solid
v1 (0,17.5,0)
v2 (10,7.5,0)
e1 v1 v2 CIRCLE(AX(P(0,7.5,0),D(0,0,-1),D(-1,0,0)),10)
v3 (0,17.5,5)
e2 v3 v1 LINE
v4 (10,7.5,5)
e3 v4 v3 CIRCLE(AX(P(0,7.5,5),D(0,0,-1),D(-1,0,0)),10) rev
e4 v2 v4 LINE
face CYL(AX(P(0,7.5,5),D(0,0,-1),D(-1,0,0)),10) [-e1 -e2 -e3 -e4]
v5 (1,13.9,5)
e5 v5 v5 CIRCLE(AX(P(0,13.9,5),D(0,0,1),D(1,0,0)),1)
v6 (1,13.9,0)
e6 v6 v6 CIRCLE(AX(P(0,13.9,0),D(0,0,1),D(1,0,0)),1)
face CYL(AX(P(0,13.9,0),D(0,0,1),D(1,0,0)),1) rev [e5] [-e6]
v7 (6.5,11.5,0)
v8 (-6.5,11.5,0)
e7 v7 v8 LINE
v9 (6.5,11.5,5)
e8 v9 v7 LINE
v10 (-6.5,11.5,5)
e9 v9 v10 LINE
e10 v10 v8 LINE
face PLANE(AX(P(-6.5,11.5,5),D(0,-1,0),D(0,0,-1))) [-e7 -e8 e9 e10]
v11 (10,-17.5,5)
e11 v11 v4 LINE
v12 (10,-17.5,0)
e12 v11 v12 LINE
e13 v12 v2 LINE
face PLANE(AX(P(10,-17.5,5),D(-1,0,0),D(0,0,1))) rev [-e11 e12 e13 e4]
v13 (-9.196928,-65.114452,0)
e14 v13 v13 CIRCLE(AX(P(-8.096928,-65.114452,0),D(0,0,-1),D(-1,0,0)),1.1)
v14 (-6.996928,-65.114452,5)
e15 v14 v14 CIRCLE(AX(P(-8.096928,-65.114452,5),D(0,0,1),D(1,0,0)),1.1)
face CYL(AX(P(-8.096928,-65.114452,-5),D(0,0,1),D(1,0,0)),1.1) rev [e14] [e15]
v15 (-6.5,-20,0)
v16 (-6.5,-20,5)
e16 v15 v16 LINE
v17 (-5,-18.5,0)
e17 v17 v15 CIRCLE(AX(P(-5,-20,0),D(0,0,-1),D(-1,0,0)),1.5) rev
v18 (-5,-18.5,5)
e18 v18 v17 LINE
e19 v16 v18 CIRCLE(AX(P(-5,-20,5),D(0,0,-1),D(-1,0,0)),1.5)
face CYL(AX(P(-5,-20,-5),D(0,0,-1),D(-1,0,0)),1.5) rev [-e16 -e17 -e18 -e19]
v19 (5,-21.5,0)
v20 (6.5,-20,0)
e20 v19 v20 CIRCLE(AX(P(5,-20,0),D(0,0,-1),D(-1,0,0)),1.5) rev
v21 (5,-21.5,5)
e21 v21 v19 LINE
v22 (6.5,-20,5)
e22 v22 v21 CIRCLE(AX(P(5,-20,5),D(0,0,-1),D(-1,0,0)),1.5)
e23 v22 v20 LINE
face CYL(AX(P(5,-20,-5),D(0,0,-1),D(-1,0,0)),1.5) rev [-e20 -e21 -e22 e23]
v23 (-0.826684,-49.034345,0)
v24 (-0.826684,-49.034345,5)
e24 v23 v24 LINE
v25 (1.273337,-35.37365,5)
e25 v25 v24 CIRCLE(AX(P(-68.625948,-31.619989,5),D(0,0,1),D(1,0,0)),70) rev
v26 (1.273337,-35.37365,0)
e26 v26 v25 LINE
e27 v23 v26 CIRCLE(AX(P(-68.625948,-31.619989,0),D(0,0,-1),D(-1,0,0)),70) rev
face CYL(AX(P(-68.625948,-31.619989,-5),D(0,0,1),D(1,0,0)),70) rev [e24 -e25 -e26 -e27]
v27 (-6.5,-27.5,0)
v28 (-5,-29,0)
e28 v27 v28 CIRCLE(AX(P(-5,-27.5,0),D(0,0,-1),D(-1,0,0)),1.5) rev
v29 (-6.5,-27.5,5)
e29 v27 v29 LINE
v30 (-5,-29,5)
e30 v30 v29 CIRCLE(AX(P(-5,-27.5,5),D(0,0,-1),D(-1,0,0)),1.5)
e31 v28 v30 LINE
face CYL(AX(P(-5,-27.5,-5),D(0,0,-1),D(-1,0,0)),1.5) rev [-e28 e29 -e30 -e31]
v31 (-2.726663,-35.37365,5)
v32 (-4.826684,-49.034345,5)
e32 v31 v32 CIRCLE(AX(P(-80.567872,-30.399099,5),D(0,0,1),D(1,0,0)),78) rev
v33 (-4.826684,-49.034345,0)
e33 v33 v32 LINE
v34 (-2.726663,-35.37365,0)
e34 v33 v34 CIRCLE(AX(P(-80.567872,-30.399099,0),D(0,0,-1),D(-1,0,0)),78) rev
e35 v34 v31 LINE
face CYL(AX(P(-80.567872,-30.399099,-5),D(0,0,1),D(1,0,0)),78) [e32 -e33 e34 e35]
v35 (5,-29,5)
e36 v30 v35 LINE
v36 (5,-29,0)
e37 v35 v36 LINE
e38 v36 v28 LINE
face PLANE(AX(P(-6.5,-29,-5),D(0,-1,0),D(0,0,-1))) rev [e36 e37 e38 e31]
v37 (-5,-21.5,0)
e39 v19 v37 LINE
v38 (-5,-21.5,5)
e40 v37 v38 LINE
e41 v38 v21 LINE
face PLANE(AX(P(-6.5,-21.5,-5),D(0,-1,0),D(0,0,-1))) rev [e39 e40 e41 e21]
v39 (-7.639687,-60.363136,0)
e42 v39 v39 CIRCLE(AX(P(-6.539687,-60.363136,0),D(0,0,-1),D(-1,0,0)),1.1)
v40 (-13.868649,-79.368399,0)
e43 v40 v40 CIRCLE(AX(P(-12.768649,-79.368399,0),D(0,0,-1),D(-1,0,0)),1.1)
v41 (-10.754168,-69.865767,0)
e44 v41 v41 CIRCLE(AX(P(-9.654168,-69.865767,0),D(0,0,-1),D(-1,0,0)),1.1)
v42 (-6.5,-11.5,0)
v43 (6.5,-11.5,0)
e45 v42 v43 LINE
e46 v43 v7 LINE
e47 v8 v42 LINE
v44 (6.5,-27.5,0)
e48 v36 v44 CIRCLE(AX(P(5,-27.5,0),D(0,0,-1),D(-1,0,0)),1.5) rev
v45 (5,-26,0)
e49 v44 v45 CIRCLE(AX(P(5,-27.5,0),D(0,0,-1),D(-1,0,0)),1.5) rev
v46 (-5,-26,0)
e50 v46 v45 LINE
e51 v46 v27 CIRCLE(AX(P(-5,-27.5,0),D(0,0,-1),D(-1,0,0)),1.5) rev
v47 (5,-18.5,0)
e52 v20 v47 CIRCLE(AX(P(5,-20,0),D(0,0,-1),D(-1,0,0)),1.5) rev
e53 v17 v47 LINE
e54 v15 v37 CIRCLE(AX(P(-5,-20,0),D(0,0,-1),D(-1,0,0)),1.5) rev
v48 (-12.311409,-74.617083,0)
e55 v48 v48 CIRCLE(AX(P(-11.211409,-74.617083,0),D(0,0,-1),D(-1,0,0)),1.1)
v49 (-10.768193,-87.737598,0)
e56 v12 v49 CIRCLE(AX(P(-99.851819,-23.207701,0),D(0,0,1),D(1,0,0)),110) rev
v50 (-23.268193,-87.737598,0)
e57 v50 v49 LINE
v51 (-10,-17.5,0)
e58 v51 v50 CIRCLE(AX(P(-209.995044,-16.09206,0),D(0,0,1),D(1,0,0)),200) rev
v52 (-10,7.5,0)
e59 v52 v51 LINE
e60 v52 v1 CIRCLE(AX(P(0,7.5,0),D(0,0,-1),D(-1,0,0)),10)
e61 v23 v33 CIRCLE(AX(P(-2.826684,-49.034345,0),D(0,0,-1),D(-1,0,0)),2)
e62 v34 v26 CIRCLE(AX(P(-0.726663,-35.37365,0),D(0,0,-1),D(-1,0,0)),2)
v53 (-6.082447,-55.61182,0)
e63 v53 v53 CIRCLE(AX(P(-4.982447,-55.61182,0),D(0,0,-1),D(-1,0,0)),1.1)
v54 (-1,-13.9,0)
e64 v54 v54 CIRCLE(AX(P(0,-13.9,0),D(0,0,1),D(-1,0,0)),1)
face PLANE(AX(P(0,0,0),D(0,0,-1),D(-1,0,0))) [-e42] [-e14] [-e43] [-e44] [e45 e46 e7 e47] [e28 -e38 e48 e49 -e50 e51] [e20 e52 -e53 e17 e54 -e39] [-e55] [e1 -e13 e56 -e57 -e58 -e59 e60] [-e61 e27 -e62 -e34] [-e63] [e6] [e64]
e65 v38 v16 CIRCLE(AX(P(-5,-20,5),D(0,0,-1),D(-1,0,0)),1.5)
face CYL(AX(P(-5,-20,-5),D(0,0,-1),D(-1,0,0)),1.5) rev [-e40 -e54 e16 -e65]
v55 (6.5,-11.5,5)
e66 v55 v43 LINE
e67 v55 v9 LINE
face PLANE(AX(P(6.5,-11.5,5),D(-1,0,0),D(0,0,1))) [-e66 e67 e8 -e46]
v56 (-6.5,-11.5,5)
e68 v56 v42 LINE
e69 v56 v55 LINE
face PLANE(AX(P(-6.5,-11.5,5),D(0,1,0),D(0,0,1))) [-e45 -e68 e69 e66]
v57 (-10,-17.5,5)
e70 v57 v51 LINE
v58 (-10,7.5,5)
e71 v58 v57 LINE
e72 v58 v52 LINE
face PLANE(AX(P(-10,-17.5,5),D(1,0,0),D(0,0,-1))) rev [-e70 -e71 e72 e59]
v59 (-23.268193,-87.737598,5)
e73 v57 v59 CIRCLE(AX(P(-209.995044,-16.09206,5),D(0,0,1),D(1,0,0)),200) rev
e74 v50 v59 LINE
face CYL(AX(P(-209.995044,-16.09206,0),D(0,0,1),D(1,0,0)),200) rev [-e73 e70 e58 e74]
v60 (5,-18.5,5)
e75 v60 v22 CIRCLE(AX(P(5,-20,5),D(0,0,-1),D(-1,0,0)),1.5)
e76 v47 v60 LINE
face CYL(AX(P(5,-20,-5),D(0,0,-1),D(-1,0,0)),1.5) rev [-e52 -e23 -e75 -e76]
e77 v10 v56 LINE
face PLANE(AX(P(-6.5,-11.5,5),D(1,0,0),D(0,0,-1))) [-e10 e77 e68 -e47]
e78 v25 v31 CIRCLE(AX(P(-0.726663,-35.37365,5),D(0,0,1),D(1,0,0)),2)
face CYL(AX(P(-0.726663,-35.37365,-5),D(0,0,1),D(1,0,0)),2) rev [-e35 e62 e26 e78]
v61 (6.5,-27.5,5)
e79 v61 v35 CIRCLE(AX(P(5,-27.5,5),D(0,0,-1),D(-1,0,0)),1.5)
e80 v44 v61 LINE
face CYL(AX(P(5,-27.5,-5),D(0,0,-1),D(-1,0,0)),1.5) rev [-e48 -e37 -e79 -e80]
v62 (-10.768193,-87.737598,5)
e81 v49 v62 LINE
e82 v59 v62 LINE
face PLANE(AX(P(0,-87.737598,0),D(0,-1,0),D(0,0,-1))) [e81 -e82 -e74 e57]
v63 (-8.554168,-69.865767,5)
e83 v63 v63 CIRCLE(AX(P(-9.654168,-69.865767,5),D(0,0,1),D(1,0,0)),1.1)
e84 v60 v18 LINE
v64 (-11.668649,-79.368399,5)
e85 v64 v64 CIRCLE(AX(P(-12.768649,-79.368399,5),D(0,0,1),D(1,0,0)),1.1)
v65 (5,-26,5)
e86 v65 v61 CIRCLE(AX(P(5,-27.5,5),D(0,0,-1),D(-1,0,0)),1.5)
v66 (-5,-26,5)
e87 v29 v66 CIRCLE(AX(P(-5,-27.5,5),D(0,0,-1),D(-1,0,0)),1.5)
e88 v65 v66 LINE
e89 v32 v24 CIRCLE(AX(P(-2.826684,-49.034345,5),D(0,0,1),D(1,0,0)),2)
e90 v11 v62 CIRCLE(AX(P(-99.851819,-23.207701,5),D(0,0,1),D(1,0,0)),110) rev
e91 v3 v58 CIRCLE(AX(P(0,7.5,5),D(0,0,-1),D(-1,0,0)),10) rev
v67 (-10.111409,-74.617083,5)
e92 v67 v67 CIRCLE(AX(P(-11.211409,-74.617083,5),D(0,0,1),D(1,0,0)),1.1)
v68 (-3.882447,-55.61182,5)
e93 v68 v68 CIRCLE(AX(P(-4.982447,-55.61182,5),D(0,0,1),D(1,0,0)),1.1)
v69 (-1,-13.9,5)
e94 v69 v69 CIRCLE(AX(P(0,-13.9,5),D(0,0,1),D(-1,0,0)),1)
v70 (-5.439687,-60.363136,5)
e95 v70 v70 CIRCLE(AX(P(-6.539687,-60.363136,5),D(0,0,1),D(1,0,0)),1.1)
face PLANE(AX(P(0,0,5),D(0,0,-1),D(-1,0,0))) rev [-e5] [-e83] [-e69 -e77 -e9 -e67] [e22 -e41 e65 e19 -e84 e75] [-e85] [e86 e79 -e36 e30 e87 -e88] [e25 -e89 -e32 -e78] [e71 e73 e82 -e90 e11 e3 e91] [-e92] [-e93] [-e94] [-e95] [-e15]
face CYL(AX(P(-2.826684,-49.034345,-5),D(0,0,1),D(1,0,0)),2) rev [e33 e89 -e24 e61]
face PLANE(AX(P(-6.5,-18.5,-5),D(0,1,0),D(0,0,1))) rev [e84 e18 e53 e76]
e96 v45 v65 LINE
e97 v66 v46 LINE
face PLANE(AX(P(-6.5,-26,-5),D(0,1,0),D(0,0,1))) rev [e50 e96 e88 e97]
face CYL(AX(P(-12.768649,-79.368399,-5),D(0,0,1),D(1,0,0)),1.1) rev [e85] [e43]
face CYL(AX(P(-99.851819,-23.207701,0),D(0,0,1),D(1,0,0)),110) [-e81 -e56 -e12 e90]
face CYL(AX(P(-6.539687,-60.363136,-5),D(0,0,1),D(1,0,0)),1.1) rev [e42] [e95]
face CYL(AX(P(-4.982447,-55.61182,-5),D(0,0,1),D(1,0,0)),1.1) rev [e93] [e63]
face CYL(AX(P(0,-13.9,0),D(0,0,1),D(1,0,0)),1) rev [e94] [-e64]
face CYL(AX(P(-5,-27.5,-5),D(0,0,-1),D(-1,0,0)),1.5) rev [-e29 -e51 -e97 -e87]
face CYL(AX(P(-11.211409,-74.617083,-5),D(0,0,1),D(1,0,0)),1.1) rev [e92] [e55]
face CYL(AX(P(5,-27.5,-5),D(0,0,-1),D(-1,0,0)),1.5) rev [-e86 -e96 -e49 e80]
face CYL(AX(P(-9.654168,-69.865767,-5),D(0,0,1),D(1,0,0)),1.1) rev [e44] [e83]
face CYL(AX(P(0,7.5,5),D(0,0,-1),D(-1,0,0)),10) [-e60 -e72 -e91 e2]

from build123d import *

# Parameters (mm, degrees)
SKETCH1_W           = 20
SKETCH1_H           = 35
SKETCH1_W_2         = 13
SKETCH1_H_2         = 23
BOSS_EXTRUDE1_DEPTH = 5
SKETCH2_R           = 1
CUT_EXTRUDE1_DEPTH  = 5
BOSS_EXTRUDE2_DEPTH = 5
FILLET1_R           = 10
SKETCH6_R           = 1.1
CUT_EXTRUDE2_DEPTH  = 10
SKETCH7_W           = 13
SKETCH7_H           = 3
CUT_EXTRUDE3_DEPTH  = 10
FILLET2_R           = 1.5


with BuildPart() as part:
    # Sketch1 → Boss-Extrude1 (new body)
    with BuildSketch(Plane.XY):
        Rectangle(SKETCH1_W, SKETCH1_H)
        Rectangle(SKETCH1_W_2, SKETCH1_H_2, mode=Mode.SUBTRACT)
    extrude(amount=BOSS_EXTRUDE1_DEPTH)

    # Sketch2 → Cut-Extrude1 (cut)
    with BuildSketch(Plane.XY.offset(5)):
        with Locations((0, 13.9)):
            Circle(SKETCH2_R)
        with Locations(Location((0, -13.9, 0), (0, 0, 180))):
            Circle(SKETCH2_R)
    extrude(amount=-CUT_EXTRUDE1_DEPTH, mode=Mode.SUBTRACT)

    # Sketch4 → Boss-Extrude2 (add)
    with BuildSketch(Plane.XY.offset(5)):
        with BuildLine():
            Line((0, -17.5), (-10, -17.5))
            ThreePointArc((-10, -17.5), (-13.470780797, -53.21636341), (-23.268193188, -87.737598108))
            Line((-23.268193188, -87.737598108), (-10.768193188, -87.737598108))
            ThreePointArc((-10.768193188, -87.737598108), (5.633525229, -54.39811862), (10, -17.5))
            Line((10, -17.5), (0, -17.5))
        make_face()
    extrude(amount=-BOSS_EXTRUDE2_DEPTH)

    # Fillet1
    fillet1_edges = [part.edges().sort_by_distance(p)[0] for p in [
        (-10, 17.5, 2.5),
        (10, 17.5, 2.5),
    ]]
    fillet(fillet1_edges, radius=FILLET1_R - 0.0001)  # a hair under: the kernel refuses the full size

    # Sketch6 → Cut-Extrude2 (cut)
    with BuildSketch(Plane.XY.offset(5)):
        with Locations((-12.768649296, -79.368399131)):
            Circle(SKETCH6_R)
        with BuildLine():
            ThreePointArc((1.273336761, -35.373649828), (-0.726663239, -33.373649828), (-2.726663239, -35.373649828))
            ThreePointArc((-2.726663239, -35.373649828), (-3.473502661, -42.250603024), (-4.826684161, -49.034344928))
            ThreePointArc((-4.826684161, -49.034344928), (-2.826684161, -51.034344928), (-0.826684161, -49.034344928))
            ThreePointArc((-0.826684161, -49.034344928), (0.561306745, -42.255954178), (1.273336761, -35.373649828))
        make_face()
        with Locations((-11.211408841, -74.617083296)):
            Circle(SKETCH6_R)
        with Locations((-9.654168385, -69.865767461)):
            Circle(SKETCH6_R)
        with Locations((-8.09692793, -65.114451626)):
            Circle(SKETCH6_R)
        with Locations((-6.539687475, -60.363135791)):
            Circle(SKETCH6_R)
        with Locations((-4.98244702, -55.611819955)):
            Circle(SKETCH6_R)
    extrude(amount=-CUT_EXTRUDE2_DEPTH, mode=Mode.SUBTRACT)

    # Sketch7 → Cut-Extrude3 (cut)
    with BuildSketch(Plane.XY.offset(5)):
        with Locations((0, -27.5)):
            Rectangle(SKETCH7_W, SKETCH7_H)
        with Locations((0, -20)):
            Rectangle(SKETCH7_W, SKETCH7_H)
    extrude(amount=-CUT_EXTRUDE3_DEPTH, mode=Mode.SUBTRACT)

    # Fillet2
    fillet2_edges = [part.edges().sort_by_distance(p)[0] for p in [
        (6.5, -26, 2.5),
        (6.5, -29, 2.5),
        (-6.5, -29, 2.5),
        (-6.5, -26, 2.5),
        (6.5, -21.5, 2.5),
        (6.5, -18.5, 2.5),
        (-6.5, -21.5, 2.5),
        (-6.5, -18.5, 2.5),
    ]]
    fillet(fillet2_edges, radius=FILLET2_R - 0.0001)  # a hair under: the kernel refuses the full size


solid = part.part
